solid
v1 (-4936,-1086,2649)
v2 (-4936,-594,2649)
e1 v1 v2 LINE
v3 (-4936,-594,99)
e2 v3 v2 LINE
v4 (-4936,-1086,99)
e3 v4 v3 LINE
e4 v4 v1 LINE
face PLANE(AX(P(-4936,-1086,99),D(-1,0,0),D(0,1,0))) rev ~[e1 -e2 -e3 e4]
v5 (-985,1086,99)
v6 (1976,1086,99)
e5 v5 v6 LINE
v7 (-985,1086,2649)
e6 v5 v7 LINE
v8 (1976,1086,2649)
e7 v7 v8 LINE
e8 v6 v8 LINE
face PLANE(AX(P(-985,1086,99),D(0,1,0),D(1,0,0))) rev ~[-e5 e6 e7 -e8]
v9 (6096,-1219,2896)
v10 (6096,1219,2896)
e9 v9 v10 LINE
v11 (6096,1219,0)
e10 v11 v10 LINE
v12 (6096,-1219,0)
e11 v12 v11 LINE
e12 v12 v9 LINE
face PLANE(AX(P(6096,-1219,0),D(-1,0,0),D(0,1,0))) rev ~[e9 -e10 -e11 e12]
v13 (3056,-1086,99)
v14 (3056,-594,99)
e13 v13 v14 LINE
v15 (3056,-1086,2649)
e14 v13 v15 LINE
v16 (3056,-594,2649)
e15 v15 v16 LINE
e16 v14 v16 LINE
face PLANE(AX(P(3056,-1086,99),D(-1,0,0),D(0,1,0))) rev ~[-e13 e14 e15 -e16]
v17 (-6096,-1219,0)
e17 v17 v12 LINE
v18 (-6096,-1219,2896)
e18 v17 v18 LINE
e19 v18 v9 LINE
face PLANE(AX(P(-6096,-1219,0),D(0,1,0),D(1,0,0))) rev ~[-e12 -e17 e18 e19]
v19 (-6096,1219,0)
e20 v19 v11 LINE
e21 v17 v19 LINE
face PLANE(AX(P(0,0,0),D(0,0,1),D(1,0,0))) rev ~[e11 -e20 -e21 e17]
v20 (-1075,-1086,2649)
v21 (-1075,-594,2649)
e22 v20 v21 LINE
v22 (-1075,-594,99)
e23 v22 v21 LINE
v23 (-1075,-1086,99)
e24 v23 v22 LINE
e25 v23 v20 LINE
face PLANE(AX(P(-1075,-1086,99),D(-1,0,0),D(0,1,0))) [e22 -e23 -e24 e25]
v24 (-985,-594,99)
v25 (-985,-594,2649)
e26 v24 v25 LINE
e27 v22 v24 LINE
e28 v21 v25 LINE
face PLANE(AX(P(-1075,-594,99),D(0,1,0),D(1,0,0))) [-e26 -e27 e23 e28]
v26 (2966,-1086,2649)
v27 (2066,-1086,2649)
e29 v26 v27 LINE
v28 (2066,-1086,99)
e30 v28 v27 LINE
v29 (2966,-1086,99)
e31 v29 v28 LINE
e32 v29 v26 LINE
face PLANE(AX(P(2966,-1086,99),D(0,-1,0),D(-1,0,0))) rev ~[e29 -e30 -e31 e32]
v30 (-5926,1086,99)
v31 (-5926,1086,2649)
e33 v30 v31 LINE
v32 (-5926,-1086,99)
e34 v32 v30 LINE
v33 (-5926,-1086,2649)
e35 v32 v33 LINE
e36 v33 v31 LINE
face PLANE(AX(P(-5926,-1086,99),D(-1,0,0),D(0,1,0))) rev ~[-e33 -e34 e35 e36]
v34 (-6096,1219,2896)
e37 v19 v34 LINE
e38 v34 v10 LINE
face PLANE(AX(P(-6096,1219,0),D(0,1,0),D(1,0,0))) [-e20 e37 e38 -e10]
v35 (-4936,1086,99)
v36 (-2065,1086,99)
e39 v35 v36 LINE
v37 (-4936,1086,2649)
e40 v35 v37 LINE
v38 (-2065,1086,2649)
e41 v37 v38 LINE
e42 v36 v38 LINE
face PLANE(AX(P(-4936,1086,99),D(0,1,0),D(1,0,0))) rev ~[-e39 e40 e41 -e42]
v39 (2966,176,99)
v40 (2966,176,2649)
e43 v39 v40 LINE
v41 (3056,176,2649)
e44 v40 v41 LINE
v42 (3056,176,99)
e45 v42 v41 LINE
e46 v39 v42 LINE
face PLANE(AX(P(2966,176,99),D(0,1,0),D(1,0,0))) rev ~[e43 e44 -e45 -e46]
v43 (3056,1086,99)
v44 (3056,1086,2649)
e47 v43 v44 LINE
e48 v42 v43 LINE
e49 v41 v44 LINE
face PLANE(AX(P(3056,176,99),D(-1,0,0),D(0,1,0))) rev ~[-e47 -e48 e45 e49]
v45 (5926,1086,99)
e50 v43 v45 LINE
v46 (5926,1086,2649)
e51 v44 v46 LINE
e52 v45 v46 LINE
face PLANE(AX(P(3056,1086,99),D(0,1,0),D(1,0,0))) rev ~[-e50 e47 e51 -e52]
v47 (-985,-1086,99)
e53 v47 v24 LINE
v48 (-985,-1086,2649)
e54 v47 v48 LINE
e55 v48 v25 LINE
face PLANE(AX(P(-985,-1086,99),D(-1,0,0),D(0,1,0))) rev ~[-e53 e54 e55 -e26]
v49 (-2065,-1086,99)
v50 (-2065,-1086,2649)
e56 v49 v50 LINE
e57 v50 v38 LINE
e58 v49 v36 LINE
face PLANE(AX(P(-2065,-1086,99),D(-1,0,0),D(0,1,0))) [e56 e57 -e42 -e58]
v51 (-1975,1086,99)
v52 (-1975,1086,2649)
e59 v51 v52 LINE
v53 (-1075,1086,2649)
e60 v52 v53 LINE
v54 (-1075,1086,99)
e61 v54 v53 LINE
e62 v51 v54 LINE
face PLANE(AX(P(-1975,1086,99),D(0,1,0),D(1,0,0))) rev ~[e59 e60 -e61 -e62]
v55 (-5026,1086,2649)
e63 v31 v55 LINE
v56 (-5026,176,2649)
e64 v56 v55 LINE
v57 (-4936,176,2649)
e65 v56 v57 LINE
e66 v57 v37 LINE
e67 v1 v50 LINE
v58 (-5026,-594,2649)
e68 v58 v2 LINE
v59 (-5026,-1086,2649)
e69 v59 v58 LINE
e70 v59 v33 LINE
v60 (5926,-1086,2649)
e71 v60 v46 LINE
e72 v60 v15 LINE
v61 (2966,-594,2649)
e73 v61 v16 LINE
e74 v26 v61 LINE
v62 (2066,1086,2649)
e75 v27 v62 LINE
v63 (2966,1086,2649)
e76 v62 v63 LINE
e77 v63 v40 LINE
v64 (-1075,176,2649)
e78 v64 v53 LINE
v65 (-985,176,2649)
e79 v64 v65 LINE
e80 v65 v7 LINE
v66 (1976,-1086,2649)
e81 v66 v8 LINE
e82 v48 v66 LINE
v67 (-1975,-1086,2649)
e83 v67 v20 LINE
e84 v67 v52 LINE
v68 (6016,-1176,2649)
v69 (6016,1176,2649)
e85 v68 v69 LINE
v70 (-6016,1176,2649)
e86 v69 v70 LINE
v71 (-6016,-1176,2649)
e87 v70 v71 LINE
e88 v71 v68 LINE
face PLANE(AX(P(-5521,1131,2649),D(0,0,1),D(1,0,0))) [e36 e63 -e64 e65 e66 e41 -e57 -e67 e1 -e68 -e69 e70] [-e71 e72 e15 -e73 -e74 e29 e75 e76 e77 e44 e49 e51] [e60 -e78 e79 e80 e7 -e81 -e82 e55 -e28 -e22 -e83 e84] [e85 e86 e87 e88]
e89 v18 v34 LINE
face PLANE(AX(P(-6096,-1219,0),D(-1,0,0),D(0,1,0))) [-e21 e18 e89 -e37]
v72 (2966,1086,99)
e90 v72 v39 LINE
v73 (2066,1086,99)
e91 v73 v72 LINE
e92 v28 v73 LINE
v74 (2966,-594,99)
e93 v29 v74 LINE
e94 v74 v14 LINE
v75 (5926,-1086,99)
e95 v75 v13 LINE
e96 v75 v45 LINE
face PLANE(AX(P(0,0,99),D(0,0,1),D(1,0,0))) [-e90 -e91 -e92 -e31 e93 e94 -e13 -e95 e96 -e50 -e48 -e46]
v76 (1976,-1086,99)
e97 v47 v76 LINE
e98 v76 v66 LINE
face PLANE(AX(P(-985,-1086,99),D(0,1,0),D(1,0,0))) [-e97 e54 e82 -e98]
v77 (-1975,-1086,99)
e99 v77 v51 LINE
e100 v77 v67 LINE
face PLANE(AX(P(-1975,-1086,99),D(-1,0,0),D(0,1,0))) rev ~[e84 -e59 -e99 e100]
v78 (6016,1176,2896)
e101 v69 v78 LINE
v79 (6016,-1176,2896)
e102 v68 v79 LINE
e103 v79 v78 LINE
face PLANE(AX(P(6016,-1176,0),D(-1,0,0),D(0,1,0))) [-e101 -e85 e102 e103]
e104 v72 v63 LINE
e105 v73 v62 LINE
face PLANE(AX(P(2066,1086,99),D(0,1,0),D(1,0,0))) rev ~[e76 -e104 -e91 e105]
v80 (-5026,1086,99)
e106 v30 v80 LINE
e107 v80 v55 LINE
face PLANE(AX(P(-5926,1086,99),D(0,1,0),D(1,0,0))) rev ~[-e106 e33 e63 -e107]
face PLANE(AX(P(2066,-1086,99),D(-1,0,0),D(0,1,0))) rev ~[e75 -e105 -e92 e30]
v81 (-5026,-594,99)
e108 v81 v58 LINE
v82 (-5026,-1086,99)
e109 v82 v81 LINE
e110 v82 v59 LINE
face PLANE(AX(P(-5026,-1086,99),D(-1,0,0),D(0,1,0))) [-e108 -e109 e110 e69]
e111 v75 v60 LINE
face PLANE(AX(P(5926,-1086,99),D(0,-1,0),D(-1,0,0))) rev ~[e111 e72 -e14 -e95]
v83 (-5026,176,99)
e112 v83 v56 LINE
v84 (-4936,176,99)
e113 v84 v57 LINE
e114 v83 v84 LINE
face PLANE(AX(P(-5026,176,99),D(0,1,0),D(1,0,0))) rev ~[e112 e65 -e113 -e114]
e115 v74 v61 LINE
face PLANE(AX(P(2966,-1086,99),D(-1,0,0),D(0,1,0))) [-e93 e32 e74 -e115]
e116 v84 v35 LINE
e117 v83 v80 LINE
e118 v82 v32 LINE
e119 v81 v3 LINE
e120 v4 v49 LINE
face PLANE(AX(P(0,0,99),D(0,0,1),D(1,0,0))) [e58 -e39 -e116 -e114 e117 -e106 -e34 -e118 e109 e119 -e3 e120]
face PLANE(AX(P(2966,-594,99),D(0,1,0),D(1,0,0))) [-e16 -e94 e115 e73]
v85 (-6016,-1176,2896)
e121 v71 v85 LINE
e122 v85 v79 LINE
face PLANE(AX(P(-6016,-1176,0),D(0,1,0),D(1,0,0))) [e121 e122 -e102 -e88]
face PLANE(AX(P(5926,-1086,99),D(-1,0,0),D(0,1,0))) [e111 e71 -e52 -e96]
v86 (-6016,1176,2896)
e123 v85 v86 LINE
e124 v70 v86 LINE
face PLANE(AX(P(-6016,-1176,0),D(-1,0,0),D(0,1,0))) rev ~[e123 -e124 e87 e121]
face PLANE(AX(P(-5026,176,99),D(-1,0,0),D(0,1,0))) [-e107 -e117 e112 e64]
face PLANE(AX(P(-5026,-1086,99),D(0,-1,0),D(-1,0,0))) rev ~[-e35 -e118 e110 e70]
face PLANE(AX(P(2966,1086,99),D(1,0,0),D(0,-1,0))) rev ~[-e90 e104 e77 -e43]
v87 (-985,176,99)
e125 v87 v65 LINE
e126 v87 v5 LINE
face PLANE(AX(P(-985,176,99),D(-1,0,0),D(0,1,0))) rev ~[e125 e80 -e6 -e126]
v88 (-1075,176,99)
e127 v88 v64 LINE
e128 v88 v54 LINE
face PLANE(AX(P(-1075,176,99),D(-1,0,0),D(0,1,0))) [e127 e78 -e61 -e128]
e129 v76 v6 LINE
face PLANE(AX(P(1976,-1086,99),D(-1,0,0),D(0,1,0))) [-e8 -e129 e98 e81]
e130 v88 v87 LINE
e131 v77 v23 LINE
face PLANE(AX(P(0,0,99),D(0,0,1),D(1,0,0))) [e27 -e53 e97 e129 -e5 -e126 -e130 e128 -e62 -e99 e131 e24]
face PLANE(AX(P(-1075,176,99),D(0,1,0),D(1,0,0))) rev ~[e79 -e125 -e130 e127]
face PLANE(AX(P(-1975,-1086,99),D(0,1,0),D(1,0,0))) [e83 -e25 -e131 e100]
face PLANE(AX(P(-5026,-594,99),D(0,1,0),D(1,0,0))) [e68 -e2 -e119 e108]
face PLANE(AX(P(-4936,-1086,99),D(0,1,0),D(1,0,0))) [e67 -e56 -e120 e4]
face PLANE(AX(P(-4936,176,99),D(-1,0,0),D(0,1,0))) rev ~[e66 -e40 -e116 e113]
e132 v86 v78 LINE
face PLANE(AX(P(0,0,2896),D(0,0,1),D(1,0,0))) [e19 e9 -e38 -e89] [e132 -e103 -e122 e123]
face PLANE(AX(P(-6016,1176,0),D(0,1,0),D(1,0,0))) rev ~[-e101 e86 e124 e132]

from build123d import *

# Parameters (mm, degrees)
F0_W     = 12192
F0_H     = 2438
F0_W_2   = 12032
F0_H_2   = 2352
F1_DEPTH = 2896
F2_DEPTH = 99
F3_W     = 90
F3_H     = 90
F3_W_2   = 2871
F3_H_2   = 910
F3_H_3   = 2172
F3_H_4   = 492
F3_W_3   = 900
F3_W_4   = 2961
F4_DEPTH = 2550


with BuildPart() as f1:
    # F0 (on Top) → F1 (new body)
    with BuildSketch(Plane.XY):
        Rectangle(F0_W, F0_H)
        Rectangle(F0_W_2, F0_H_2, mode=Mode.SUBTRACT)
    extrude(amount=F1_DEPTH)

    # F0 (on Top) → F2 (join)
    with BuildSketch(Plane.XY):
        Rectangle(F0_W_2, F0_H_2)
    extrude(amount=F2_DEPTH)

    # F3 (on face) → F4 (join)
    with BuildSketch(Plane.XY.offset(99)):
        Polygon((-5026, 1086), (-5026, 1176), (-6016, 1176), (-6016, 1086), (-5926, 1086), align=None)
        with Locations((-4981, 1131)):
            Rectangle(F3_W, F3_H)
        with Locations((-3500.5, 1131)):
            Rectangle(F3_W_2, F3_H)
        with Locations((-4981, 631)):
            Rectangle(F3_W, F3_H_2)
        with Locations((-5971, 0)):
            Rectangle(F3_W, F3_H_3)
        Polygon((-5026, -1176), (-5026, -1086), (-5926, -1086), (-6016, -1086), (-6016, -1176), align=None)
        with Locations((-4981, -840)):
            Rectangle(F3_W, F3_H_4)
        with Locations((-4981, -1131)):
            Rectangle(F3_W, F3_H)
        with Locations((-3500.5, -1131)):
            Rectangle(F3_W_2, F3_H)
        with Locations((-2020, 0)):
            Rectangle(F3_W, F3_H_3)
        with Locations((-2020, 1131)):
            Rectangle(F3_W, F3_H)
        with Locations((-1525, 1131)):
            Rectangle(F3_W_3, F3_H)
        with Locations((-1030, 1131)):
            Rectangle(F3_W, F3_H)
        with Locations((495.5, 1131)):
            Rectangle(F3_W_4, F3_H)
        with Locations((-1030, 631)):
            Rectangle(F3_W, F3_H_2)
        with Locations((-1525, -1131)):
            Rectangle(F3_W_3, F3_H)
        with Locations((-2020, -1131)):
            Rectangle(F3_W, F3_H)
        with Locations((-1030, -840)):
            Rectangle(F3_W, F3_H_4)
        with Locations((-1030, -1131)):
            Rectangle(F3_W, F3_H)
        with Locations((495.5, -1131)):
            Rectangle(F3_W_4, F3_H)
        with Locations((2021, 0)):
            Rectangle(F3_W, F3_H_3)
        with Locations((2021, 1131)):
            Rectangle(F3_W, F3_H)
        with Locations((2021, -1131)):
            Rectangle(F3_W, F3_H)
        with Locations((2516, -1131)):
            Rectangle(F3_W_3, F3_H)
        with Locations((3011, -1131)):
            Rectangle(F3_W, F3_H)
        Polygon((5926, -1086), (3056, -1086), (3056, -1176), (6016, -1176), (6016, -1086), align=None)
        with Locations((3011, -840)):
            Rectangle(F3_W, F3_H_4)
        with Locations((3011, 631)):
            Rectangle(F3_W, F3_H_2)
        with Locations((3011, 1131)):
            Rectangle(F3_W, F3_H)
        with Locations((2516, 1131)):
            Rectangle(F3_W_3, F3_H)
        Polygon((6016, 1176), (3056, 1176), (3056, 1086), (5926, 1086), (6016, 1086), align=None)
        with Locations((5971, 0)):
            Rectangle(F3_W, F3_H_3)
    extrude(amount=F4_DEPTH)


solid = f1.part
